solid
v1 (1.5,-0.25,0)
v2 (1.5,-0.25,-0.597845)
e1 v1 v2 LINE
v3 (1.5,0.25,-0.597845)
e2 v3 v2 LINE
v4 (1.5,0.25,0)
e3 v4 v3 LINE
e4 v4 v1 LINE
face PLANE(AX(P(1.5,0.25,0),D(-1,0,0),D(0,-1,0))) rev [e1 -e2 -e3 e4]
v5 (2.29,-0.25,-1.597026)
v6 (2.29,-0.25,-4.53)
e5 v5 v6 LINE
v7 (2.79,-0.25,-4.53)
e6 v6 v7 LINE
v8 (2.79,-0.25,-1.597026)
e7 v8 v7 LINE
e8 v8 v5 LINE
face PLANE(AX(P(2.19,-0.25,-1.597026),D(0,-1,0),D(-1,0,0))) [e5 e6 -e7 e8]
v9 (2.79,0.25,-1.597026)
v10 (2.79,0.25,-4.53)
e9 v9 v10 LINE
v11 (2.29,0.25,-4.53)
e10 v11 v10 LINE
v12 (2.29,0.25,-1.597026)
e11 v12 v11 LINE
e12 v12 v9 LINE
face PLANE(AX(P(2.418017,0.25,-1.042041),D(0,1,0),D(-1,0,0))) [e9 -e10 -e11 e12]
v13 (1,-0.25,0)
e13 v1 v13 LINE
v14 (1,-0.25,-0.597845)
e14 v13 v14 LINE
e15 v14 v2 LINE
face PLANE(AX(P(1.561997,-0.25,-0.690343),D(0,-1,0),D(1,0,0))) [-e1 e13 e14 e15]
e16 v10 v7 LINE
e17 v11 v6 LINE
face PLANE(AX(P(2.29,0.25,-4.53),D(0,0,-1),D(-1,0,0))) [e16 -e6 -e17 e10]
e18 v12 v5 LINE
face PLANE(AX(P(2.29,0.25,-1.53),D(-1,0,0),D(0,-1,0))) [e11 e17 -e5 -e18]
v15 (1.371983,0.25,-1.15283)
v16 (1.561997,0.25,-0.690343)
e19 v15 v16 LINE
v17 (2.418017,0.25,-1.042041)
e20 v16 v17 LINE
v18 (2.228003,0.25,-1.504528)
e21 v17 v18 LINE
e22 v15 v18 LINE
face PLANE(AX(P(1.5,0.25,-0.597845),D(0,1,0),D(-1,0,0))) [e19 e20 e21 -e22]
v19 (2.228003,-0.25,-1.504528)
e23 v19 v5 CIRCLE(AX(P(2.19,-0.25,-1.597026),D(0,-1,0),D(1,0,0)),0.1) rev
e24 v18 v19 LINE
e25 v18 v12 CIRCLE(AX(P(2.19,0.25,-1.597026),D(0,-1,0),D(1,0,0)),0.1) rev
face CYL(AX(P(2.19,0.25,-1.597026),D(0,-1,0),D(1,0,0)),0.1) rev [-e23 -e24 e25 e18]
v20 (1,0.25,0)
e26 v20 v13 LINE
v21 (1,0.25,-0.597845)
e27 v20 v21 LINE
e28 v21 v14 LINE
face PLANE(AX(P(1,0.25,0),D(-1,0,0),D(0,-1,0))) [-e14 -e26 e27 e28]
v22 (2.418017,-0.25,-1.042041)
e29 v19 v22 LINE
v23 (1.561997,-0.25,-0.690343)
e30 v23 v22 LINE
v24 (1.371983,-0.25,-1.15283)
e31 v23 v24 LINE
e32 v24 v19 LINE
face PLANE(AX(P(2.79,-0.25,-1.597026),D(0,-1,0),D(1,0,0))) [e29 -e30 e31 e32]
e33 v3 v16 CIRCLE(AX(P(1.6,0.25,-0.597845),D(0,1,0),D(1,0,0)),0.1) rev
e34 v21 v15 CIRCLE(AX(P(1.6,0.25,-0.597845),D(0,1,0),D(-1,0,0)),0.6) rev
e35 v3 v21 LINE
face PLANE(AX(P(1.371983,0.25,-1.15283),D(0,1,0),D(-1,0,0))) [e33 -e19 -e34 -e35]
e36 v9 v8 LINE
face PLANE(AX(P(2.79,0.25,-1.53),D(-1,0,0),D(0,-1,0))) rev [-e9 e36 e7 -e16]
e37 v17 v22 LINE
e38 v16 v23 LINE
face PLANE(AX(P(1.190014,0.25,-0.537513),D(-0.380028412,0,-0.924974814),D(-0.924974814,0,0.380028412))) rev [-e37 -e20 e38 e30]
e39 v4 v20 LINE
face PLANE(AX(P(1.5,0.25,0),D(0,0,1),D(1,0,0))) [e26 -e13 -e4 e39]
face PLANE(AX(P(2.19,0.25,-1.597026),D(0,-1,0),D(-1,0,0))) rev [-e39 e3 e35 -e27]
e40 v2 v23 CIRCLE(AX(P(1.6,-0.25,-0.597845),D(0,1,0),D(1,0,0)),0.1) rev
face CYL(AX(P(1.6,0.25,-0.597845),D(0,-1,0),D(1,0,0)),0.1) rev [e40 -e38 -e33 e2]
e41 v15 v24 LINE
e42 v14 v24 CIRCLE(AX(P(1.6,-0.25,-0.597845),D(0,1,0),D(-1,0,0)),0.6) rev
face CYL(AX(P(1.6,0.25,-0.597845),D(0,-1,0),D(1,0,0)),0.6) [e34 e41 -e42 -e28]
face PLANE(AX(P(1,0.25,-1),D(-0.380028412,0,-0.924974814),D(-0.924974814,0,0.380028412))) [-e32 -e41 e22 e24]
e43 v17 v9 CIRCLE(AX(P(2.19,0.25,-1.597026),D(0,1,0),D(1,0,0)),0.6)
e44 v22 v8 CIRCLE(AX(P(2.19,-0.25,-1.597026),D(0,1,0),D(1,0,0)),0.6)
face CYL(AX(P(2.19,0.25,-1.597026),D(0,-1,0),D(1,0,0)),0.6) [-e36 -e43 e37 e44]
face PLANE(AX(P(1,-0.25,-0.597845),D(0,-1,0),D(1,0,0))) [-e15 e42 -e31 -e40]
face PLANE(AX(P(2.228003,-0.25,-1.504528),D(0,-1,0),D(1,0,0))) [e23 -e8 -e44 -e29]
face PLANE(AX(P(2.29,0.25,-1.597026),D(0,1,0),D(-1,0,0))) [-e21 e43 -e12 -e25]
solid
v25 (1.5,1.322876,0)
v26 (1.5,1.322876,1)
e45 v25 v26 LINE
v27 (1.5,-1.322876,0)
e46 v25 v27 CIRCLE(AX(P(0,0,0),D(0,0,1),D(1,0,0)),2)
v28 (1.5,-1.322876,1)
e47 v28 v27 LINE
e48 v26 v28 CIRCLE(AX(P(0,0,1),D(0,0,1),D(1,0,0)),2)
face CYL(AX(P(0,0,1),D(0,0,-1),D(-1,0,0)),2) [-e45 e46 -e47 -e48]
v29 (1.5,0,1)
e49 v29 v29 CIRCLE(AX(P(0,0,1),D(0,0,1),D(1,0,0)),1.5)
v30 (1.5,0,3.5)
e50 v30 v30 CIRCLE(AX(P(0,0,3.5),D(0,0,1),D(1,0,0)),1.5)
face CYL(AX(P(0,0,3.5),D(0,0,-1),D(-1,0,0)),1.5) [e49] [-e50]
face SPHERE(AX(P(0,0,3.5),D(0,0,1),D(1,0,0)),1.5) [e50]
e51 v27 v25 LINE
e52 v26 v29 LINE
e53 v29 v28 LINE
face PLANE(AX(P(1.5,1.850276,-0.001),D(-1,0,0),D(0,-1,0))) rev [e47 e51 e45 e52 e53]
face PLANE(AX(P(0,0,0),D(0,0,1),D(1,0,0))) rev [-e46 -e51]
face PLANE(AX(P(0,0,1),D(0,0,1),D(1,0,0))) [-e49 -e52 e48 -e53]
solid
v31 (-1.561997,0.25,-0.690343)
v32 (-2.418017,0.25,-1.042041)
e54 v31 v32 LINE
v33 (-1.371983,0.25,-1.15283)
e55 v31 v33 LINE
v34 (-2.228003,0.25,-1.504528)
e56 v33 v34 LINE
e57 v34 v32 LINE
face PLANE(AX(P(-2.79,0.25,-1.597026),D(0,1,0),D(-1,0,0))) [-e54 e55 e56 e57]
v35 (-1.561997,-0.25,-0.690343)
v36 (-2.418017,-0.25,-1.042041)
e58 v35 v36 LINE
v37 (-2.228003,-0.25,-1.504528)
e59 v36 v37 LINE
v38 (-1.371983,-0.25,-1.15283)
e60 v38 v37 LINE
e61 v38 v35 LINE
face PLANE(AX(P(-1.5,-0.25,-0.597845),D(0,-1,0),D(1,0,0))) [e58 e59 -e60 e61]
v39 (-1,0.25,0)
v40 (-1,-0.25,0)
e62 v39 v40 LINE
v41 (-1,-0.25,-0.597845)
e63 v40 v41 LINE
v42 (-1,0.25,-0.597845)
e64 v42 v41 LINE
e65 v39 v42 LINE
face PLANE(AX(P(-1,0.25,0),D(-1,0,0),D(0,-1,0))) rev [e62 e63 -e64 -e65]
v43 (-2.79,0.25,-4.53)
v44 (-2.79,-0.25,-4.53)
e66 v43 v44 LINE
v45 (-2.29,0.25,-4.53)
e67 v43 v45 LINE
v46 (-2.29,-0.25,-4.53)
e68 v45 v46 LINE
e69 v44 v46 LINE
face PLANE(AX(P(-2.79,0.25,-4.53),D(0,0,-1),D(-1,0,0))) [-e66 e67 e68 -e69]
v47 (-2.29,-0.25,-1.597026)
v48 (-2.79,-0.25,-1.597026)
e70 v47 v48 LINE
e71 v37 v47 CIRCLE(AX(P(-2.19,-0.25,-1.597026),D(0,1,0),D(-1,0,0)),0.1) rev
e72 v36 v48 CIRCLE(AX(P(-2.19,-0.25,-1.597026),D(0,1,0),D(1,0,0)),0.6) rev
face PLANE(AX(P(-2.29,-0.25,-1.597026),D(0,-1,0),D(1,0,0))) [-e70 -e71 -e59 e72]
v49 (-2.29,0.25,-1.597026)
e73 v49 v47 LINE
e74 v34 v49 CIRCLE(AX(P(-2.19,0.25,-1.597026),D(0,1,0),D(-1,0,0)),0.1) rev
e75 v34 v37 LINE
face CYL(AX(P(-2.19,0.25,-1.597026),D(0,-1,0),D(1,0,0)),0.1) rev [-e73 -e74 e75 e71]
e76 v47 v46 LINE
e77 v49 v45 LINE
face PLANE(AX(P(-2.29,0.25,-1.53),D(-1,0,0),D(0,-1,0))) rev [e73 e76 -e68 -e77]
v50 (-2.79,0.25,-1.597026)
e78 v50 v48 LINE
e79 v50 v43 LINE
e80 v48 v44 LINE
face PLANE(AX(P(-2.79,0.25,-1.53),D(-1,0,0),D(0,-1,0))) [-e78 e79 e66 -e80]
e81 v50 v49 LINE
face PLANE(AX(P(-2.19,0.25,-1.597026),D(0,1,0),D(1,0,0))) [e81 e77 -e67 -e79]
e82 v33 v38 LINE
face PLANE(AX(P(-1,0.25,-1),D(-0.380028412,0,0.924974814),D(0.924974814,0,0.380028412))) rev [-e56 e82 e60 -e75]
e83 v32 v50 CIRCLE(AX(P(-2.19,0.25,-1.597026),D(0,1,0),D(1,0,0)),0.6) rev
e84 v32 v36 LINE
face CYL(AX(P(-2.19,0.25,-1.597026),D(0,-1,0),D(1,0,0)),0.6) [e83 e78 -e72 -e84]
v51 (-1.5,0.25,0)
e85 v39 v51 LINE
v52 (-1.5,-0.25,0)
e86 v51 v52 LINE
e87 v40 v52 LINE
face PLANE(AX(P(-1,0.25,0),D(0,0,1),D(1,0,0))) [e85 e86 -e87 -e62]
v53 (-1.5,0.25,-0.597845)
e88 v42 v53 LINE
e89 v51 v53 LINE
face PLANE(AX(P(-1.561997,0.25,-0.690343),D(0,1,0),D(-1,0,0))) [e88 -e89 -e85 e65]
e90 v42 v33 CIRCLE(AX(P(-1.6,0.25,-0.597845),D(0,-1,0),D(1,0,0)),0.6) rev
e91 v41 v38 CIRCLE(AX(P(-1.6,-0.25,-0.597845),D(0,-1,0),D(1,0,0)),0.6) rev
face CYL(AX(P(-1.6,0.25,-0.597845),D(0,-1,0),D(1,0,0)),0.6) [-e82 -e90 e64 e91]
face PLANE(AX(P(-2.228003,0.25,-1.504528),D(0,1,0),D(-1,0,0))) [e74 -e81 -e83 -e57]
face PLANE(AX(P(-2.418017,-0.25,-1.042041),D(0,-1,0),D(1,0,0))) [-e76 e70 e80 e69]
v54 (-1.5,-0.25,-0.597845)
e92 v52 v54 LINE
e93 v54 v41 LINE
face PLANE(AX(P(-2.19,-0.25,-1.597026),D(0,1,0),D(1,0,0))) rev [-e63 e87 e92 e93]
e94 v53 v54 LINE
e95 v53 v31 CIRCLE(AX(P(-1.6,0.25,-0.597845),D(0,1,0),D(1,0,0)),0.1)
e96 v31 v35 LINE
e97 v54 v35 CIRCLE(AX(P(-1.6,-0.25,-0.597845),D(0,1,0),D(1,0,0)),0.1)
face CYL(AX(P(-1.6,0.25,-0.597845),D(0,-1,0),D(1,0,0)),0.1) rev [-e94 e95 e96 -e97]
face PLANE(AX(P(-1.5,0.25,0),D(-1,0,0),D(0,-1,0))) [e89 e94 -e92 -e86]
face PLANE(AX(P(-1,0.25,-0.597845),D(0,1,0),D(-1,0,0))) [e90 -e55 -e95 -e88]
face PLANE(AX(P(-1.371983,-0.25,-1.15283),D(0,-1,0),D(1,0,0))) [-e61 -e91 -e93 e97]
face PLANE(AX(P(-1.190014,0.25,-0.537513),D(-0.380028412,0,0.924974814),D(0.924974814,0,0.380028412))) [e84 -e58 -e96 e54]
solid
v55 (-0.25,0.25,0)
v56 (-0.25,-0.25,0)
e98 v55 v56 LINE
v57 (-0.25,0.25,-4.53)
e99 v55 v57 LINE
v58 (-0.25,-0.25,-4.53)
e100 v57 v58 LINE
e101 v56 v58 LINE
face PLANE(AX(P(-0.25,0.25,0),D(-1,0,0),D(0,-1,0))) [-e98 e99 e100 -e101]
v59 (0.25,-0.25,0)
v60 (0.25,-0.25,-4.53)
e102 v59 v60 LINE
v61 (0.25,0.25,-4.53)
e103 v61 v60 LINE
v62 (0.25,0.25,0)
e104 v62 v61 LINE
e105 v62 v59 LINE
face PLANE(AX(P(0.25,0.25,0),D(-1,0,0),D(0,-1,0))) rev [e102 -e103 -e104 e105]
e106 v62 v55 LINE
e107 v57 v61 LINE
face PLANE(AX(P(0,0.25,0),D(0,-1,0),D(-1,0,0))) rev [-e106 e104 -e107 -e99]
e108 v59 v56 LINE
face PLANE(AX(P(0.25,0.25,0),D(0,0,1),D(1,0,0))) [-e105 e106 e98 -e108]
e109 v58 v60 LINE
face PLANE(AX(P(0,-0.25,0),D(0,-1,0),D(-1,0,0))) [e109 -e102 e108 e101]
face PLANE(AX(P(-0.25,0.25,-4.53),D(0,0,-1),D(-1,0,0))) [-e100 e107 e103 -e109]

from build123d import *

# Parameters (mm, degrees)
SKETCH1_R           = 2
BOSS_EXTRUDE1_DEPTH = 1
SKETCH2_R           = 1.5
BOSS_EXTRUDE2_DEPTH = 2.5
DOME1_FACE_RADIUS   = 1.5
DOME1_HEIGHT        = 1.5
CUT_EXTRUDE1_REACH  = 6.899
SKETCH3_W           = 0.5
SKETCH3_H           = 4.031292186
SKETCH8_W           = 0.5
SKETCH8_H           = 4.53
BASE_FLANGE1_DEPTH  = 0.25
BASE_FLANGE2_DEPTH  = 0.25
BASE_FLANGE3_DEPTH  = 0.25


# Sheet-metal steps are written as plain solids
with BuildPart() as part:
    # Sketch1 → Boss-Extrude1 (new body)
    with BuildSketch(Plane.XY):
        Circle(SKETCH1_R)
    extrude(amount=BOSS_EXTRUDE1_DEPTH)

    # Sketch2 → Boss-Extrude2 (add)
    with BuildSketch(Plane.XY.offset(1)):
        Circle(SKETCH2_R)
    extrude(amount=BOSS_EXTRUDE2_DEPTH)

    # Dome1: a dome of height H over a round flat face of radius A is a cap of a sphere of radius (A * A + H * H) / (2 * H)
    dome1_r = (DOME1_FACE_RADIUS * DOME1_FACE_RADIUS + DOME1_HEIGHT * DOME1_HEIGHT) / (2 * DOME1_HEIGHT)
    dome1_base = Plane((0, 0, 3.5), z_dir=(0, 0, 1))
    with Locations(dome1_base.offset(DOME1_HEIGHT - dome1_r)):
        dome1_ball = Sphere(dome1_r, mode=Mode.PRIVATE)
    add(split(dome1_ball, bisect_by=dome1_base, keep=Keep.TOP, mode=Mode.PRIVATE))

    # Sketch3 → Cut-Extrude1 (cut, up to next)
    with BuildSketch(Plane.XY.offset(1), mode=Mode.PRIVATE) as cut_extrude1_sk1:
        with Locations((1.75, -0.165370345)):
            Rectangle(SKETCH3_W, SKETCH3_H)
    cut_extrude1_tool1 = extrude(cut_extrude1_sk1.sketch, amount=-CUT_EXTRUDE1_REACH, mode=Mode.PRIVATE) & part.part
    add(cut_extrude1_tool1.solids().sort_by_distance((1.75, -0.16537, 1))[0], mode=Mode.SUBTRACT)


with BuildPart() as body_2:
    # Sketch8 → Base-Flange1 (new, symmetric)
    with BuildSketch(Plane(origin=(0, 0, 0), x_dir=(1, 0, 0), z_dir=(0, 1, 0))):
        with Locations((0, 2.265)):
            Rectangle(SKETCH8_W, SKETCH8_H)
    extrude(amount=BASE_FLANGE1_DEPTH, both=True)


with BuildPart() as body_3:
    # Sketch11 → Base-Flange2 (new, symmetric)
    with BuildSketch(Plane(origin=(0, 0, 0), x_dir=(1, 0, 0), z_dir=(0, 1, 0))):
        with BuildLine():
            Line((1, 0), (1, 0.597845317))
            ThreePointArc((1, 0.597845317), (1.101597438, 0.931903524), (1.371982953, 1.152830205))
            Line((1.371982953, 1.152830205), (2.228002841, 1.504528299))
            ThreePointArc((2.228002841, 1.504528299), (2.273067094, 1.541349413), (2.29, 1.59702578))
            Line((2.29, 1.59702578), (2.29, 4.53))
            Line((2.29, 4.53), (2.79, 4.53))
            Line((2.79, 4.53), (2.79, 1.59702578))
            ThreePointArc((2.79, 1.59702578), (2.688402562, 1.262967573), (2.418017047, 1.042040892))
            Line((2.418017047, 1.042040892), (1.561997159, 0.690342799))
            ThreePointArc((1.561997159, 0.690342799), (1.516932906, 0.653521685), (1.5, 0.597845317))
            Line((1.5, 0.597845317), (1.5, 0))
            Line((1.5, 0), (1, 0))
        make_face()
    extrude(amount=BASE_FLANGE2_DEPTH, both=True)


with BuildPart() as body_4:
    # Sketch14 → Base-Flange3 (new, symmetric)
    with BuildSketch(Plane(origin=(0, 0, 0), x_dir=(1, 0, 0), z_dir=(0, 1, 0))):
        with BuildLine():
            Line((-1, 0), (-1, 0.597845317))
            ThreePointArc((-1, 0.597845317), (-1.101597438, 0.931903524), (-1.371982953, 1.152830205))
            Line((-1.371982953, 1.152830205), (-2.228002841, 1.504528299))
            ThreePointArc((-2.228002841, 1.504528299), (-2.273067094, 1.541349413), (-2.29, 1.59702578))
            Line((-2.29, 1.59702578), (-2.29, 4.53))
            Line((-2.29, 4.53), (-2.79, 4.53))
            Line((-2.79, 4.53), (-2.79, 1.59702578))
            ThreePointArc((-2.79, 1.59702578), (-2.688402562, 1.262967573), (-2.418017047, 1.042040892))
            Line((-2.418017047, 1.042040892), (-1.561997159, 0.690342799))
            ThreePointArc((-1.561997159, 0.690342799), (-1.516932906, 0.653521685), (-1.5, 0.597845317))
            Line((-1.5, 0.597845317), (-1.5, 0))
            Line((-1.5, 0), (-1, 0))
        make_face()
    extrude(amount=BASE_FLANGE3_DEPTH, both=True)


solid = Compound([part.part, body_2.part, body_3.part, body_4.part])
